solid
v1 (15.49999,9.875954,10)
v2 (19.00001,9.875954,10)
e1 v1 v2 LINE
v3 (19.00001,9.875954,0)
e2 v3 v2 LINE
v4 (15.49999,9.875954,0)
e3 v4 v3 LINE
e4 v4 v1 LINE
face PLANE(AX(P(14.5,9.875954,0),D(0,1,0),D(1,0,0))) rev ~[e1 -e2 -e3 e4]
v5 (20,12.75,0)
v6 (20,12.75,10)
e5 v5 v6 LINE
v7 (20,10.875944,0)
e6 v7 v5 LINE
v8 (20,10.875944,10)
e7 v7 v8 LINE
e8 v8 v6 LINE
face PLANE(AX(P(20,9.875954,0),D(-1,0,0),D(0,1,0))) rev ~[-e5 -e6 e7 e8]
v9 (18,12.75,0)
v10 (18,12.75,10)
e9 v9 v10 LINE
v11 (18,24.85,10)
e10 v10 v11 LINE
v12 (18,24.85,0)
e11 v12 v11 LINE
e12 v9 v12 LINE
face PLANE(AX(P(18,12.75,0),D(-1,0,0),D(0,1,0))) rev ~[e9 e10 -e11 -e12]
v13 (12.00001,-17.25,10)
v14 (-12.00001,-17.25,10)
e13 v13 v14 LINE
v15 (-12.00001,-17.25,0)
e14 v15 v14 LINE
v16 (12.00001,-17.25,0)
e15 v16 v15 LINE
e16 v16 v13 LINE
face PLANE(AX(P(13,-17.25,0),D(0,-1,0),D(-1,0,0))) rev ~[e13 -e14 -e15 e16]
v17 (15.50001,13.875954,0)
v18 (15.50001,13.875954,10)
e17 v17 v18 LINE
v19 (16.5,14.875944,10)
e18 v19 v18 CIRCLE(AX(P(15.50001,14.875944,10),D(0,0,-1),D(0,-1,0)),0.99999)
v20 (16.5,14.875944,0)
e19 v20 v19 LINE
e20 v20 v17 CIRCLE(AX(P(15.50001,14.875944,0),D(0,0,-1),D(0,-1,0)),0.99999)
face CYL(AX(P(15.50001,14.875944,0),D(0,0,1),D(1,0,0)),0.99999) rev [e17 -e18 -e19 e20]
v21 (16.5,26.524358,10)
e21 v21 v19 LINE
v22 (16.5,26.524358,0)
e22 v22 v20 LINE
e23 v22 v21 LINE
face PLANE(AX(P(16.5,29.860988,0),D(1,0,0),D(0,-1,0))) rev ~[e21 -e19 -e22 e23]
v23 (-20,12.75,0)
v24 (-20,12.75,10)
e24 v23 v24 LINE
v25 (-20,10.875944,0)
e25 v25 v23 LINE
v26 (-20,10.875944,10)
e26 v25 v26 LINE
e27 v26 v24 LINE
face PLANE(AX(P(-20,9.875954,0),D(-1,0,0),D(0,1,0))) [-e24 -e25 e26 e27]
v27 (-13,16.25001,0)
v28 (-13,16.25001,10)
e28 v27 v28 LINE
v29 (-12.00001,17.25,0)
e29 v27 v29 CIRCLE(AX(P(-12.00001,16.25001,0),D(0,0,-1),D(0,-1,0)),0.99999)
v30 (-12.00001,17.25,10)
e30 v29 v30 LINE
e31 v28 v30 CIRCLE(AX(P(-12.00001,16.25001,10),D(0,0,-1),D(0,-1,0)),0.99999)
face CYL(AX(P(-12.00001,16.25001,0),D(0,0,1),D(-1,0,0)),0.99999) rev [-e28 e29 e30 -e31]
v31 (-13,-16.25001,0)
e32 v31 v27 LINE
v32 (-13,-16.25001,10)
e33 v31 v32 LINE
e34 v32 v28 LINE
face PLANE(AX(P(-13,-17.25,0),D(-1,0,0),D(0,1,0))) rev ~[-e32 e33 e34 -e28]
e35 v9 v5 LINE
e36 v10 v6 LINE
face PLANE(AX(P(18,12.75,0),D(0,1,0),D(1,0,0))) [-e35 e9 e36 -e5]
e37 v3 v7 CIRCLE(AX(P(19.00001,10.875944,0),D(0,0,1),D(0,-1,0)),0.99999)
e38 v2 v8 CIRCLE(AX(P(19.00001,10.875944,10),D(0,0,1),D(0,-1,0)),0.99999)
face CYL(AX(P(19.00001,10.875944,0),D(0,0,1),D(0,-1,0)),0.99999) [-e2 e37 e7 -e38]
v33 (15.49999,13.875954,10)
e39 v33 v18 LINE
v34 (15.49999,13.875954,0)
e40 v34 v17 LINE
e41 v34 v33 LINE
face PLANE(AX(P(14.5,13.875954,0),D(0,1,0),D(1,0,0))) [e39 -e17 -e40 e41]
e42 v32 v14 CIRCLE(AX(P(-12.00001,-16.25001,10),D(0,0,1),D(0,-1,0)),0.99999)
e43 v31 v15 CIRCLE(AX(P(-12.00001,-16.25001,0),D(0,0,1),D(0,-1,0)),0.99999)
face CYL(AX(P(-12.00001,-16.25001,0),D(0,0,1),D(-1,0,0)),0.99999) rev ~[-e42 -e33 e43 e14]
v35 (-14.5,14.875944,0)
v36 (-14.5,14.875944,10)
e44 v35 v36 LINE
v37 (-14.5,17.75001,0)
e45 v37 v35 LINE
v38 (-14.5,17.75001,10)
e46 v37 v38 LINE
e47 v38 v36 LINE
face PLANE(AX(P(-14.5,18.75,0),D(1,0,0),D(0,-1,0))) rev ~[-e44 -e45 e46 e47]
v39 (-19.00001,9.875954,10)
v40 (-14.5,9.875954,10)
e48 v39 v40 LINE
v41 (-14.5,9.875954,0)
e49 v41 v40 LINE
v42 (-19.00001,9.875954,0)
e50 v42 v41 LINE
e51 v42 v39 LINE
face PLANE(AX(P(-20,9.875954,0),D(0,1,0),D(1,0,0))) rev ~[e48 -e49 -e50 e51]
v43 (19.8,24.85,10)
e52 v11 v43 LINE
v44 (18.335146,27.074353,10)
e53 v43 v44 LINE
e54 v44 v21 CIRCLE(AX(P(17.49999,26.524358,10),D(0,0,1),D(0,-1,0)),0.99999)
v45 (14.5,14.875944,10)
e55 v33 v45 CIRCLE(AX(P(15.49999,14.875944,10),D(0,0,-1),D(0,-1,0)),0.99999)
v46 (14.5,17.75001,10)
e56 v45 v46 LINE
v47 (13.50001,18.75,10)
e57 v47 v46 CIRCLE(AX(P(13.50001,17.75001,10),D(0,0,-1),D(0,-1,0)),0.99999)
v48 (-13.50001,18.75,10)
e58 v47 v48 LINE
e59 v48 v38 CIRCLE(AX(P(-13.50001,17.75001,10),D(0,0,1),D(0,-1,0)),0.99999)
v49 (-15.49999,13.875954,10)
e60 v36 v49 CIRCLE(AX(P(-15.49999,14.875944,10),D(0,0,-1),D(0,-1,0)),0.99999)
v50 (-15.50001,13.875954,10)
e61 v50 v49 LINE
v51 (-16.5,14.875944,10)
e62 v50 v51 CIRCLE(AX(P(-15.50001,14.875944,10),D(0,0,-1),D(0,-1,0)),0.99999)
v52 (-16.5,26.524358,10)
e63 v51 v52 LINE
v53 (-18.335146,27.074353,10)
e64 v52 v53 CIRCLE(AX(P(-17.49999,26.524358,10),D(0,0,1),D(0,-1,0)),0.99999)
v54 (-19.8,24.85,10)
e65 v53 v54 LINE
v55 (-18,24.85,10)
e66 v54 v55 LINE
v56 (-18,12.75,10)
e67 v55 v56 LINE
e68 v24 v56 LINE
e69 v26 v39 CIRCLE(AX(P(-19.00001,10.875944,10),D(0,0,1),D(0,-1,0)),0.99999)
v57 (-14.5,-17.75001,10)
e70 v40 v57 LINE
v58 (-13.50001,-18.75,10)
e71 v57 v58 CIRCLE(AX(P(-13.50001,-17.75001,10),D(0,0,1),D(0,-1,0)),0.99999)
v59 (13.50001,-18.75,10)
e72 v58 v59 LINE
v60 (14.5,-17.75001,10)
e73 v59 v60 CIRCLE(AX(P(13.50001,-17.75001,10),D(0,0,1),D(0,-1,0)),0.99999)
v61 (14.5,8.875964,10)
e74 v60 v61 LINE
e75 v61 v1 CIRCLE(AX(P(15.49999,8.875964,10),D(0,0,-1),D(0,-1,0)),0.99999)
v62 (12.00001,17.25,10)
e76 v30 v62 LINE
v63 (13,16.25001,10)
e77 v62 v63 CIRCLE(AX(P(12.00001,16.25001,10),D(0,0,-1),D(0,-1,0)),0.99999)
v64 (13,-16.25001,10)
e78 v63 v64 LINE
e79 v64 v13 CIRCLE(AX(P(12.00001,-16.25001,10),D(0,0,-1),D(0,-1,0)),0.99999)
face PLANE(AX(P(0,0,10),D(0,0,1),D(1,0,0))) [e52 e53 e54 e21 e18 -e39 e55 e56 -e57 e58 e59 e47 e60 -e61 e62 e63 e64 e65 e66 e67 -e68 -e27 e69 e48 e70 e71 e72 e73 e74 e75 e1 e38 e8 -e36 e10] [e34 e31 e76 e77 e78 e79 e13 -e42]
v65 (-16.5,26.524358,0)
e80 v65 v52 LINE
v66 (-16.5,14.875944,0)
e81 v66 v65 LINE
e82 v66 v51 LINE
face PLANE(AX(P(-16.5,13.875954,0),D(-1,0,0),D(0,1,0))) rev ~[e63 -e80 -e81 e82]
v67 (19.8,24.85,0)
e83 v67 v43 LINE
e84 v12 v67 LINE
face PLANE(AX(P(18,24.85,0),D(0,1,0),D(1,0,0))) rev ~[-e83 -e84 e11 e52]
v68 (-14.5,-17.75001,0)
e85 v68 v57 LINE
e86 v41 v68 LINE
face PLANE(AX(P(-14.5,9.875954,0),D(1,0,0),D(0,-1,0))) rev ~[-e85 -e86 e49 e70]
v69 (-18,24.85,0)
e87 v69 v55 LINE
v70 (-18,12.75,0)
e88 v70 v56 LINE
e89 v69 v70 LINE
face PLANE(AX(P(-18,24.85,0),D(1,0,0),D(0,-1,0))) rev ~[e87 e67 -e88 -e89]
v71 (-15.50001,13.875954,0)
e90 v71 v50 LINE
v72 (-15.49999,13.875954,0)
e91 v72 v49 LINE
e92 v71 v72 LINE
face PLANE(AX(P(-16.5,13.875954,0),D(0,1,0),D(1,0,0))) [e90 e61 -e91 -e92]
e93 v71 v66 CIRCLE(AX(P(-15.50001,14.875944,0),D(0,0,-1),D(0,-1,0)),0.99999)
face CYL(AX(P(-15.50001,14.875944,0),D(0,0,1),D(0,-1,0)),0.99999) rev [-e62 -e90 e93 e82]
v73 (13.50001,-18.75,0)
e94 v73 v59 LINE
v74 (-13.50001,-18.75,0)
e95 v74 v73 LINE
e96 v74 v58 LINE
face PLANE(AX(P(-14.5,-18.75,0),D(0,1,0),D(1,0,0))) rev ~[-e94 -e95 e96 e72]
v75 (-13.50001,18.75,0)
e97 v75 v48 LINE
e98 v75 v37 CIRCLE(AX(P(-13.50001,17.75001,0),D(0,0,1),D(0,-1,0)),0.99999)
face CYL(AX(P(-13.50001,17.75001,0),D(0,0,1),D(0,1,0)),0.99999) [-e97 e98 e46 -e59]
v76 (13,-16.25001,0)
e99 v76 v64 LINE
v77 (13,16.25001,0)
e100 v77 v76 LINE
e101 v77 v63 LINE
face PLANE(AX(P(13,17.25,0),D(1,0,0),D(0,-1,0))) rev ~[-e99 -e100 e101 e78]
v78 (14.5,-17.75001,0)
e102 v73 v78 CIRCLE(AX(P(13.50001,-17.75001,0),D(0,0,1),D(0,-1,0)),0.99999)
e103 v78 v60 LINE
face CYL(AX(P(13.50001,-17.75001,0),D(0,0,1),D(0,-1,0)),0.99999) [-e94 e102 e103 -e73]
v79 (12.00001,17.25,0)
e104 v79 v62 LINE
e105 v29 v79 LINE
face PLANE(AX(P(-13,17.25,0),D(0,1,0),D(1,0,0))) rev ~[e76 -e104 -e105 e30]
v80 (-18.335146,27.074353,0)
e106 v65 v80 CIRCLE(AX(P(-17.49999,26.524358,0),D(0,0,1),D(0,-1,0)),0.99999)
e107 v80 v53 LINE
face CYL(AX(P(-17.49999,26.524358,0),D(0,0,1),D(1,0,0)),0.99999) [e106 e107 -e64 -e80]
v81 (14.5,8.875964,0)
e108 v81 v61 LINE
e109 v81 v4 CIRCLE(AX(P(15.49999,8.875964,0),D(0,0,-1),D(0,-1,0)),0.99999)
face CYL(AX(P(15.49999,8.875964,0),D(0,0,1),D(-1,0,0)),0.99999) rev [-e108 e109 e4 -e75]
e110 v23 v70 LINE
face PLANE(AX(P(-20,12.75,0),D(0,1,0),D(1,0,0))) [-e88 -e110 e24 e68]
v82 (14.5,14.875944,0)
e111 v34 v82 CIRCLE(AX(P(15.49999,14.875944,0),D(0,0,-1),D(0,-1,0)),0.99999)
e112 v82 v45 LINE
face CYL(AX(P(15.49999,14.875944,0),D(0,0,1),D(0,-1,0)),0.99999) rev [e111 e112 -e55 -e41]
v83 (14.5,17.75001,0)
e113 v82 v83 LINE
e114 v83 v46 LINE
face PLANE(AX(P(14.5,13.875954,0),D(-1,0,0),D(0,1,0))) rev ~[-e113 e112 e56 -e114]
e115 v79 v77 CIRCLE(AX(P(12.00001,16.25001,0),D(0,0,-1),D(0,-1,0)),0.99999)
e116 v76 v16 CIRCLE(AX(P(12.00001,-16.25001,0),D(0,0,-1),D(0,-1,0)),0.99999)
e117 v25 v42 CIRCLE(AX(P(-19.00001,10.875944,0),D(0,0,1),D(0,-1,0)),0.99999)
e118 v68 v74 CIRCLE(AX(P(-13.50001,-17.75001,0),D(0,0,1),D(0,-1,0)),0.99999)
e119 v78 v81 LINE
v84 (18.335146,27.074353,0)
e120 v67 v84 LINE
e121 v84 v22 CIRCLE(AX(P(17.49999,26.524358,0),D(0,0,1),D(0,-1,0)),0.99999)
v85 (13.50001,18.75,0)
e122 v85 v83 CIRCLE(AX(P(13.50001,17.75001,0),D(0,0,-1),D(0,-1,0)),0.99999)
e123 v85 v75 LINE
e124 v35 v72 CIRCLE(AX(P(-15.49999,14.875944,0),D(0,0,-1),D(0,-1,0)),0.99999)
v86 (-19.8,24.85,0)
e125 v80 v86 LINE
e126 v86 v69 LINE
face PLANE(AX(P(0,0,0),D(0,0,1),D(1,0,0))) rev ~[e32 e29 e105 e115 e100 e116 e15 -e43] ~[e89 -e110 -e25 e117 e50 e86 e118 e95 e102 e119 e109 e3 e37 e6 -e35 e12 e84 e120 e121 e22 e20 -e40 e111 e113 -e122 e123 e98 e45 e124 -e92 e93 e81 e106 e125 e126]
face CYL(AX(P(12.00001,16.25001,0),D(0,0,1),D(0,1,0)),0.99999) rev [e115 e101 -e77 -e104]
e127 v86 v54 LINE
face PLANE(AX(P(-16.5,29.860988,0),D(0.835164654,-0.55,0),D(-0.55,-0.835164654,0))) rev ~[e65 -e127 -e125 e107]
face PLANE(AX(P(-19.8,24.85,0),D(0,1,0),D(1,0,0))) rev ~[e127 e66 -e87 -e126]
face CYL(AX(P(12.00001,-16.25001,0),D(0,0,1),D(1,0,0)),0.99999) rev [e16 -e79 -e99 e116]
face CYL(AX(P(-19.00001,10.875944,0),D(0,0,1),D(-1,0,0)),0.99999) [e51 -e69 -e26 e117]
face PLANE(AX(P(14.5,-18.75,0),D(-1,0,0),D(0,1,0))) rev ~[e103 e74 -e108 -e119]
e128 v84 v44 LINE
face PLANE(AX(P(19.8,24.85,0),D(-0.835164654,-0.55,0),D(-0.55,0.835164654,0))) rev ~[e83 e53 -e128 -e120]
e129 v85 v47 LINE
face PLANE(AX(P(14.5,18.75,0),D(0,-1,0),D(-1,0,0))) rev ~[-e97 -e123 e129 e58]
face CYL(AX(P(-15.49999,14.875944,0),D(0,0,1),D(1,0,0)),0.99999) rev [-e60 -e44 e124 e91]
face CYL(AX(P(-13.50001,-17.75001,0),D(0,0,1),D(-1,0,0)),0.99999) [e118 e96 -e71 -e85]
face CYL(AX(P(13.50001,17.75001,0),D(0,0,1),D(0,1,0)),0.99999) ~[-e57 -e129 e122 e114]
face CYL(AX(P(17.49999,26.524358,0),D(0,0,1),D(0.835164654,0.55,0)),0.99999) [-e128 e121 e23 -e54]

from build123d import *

# Parameters (mm, degrees)
F0_W     = 2
F0_H     = 4
F0_H_2   = 2.8740456328
F1_DEPTH = 10
F2_R     = 0.99999


# Not quite as in the source:
# - a fillet or chamfer is up to 0.001 mm smaller than in the source, because OpenCascade refuses the exact size


with BuildPart() as f1:
    # F0 (on Top) → F1 (new body)
    with BuildSketch(Plane.XY):
        Polygon((14.5, 18.75), (-14.5, 18.75), (-14.5, 13.8759543672), (-14.5, 9.8759543672), (-14.5, -18.75), (14.5, -18.75), (14.5, 9.8759543672), (14.5, 13.8759543672), align=None)
        Polygon((-13, 4.7144976147), (-13, 17.25), (13, 17.25), (13, 4.7144976147), (13, -2.2855023853), (13, -17.25), (-13, -17.25), (-13, -2.2855023853), align=None, mode=Mode.SUBTRACT)
        with Locations((-15.5, 11.8759543672)):
            Rectangle(F0_W, F0_H)
        Polygon((-16.5, 9.8759543672), (-16.5, 13.8759543672), (-16.5, 29.8609879265), (-19.8, 24.85), (-18, 24.85), (-18, 12.75), (-18, 9.8759543672), align=None)
        with Locations((15.5, 11.8759543672)):
            Rectangle(F0_W, F0_H)
        Polygon((16.5, 29.8609879265), (16.5, 13.8759543672), (16.5, 9.8759543672), (18, 9.8759543672), (18, 12.75), (18, 24.85), (19.8, 24.85), align=None)
        with Locations((-19, 11.3129771836)):
            Rectangle(F0_W, F0_H_2)
        with Locations((19, 11.3129771836)):
            Rectangle(F0_W, F0_H_2)
    extrude(amount=F1_DEPTH)

    # F2 (radius 1 in the source; OpenCascade refuses exactly that, so slightly less here)
    f2_edges = [f1.edges().sort_by_distance(p)[0] for p in [
        (-14.5, 18.75, 5),
        (-20, 9.875954, 5),
        (14.5, 18.75, 5),
        (20, 9.875954, 5),
        (-13, 17.25, 5),
        (14.5, 9.875954, 5),
        (14.5, -18.75, 5),
        (-14.5, -18.75, 5),
        (-13, -17.25, 5),
        (13, 17.25, 5),
        (13, -17.25, 5),
        (-14.5, 13.875954, 5),
        (16.5, 13.875954, 5),
        (-16.5, 13.875954, 5),
        (14.5, 13.875954, 5),
        (-16.5, 29.860988, 5),
        (16.5, 29.860988, 5),
    ]]
    fillet(f2_edges, radius=F2_R)


solid = f1.part
